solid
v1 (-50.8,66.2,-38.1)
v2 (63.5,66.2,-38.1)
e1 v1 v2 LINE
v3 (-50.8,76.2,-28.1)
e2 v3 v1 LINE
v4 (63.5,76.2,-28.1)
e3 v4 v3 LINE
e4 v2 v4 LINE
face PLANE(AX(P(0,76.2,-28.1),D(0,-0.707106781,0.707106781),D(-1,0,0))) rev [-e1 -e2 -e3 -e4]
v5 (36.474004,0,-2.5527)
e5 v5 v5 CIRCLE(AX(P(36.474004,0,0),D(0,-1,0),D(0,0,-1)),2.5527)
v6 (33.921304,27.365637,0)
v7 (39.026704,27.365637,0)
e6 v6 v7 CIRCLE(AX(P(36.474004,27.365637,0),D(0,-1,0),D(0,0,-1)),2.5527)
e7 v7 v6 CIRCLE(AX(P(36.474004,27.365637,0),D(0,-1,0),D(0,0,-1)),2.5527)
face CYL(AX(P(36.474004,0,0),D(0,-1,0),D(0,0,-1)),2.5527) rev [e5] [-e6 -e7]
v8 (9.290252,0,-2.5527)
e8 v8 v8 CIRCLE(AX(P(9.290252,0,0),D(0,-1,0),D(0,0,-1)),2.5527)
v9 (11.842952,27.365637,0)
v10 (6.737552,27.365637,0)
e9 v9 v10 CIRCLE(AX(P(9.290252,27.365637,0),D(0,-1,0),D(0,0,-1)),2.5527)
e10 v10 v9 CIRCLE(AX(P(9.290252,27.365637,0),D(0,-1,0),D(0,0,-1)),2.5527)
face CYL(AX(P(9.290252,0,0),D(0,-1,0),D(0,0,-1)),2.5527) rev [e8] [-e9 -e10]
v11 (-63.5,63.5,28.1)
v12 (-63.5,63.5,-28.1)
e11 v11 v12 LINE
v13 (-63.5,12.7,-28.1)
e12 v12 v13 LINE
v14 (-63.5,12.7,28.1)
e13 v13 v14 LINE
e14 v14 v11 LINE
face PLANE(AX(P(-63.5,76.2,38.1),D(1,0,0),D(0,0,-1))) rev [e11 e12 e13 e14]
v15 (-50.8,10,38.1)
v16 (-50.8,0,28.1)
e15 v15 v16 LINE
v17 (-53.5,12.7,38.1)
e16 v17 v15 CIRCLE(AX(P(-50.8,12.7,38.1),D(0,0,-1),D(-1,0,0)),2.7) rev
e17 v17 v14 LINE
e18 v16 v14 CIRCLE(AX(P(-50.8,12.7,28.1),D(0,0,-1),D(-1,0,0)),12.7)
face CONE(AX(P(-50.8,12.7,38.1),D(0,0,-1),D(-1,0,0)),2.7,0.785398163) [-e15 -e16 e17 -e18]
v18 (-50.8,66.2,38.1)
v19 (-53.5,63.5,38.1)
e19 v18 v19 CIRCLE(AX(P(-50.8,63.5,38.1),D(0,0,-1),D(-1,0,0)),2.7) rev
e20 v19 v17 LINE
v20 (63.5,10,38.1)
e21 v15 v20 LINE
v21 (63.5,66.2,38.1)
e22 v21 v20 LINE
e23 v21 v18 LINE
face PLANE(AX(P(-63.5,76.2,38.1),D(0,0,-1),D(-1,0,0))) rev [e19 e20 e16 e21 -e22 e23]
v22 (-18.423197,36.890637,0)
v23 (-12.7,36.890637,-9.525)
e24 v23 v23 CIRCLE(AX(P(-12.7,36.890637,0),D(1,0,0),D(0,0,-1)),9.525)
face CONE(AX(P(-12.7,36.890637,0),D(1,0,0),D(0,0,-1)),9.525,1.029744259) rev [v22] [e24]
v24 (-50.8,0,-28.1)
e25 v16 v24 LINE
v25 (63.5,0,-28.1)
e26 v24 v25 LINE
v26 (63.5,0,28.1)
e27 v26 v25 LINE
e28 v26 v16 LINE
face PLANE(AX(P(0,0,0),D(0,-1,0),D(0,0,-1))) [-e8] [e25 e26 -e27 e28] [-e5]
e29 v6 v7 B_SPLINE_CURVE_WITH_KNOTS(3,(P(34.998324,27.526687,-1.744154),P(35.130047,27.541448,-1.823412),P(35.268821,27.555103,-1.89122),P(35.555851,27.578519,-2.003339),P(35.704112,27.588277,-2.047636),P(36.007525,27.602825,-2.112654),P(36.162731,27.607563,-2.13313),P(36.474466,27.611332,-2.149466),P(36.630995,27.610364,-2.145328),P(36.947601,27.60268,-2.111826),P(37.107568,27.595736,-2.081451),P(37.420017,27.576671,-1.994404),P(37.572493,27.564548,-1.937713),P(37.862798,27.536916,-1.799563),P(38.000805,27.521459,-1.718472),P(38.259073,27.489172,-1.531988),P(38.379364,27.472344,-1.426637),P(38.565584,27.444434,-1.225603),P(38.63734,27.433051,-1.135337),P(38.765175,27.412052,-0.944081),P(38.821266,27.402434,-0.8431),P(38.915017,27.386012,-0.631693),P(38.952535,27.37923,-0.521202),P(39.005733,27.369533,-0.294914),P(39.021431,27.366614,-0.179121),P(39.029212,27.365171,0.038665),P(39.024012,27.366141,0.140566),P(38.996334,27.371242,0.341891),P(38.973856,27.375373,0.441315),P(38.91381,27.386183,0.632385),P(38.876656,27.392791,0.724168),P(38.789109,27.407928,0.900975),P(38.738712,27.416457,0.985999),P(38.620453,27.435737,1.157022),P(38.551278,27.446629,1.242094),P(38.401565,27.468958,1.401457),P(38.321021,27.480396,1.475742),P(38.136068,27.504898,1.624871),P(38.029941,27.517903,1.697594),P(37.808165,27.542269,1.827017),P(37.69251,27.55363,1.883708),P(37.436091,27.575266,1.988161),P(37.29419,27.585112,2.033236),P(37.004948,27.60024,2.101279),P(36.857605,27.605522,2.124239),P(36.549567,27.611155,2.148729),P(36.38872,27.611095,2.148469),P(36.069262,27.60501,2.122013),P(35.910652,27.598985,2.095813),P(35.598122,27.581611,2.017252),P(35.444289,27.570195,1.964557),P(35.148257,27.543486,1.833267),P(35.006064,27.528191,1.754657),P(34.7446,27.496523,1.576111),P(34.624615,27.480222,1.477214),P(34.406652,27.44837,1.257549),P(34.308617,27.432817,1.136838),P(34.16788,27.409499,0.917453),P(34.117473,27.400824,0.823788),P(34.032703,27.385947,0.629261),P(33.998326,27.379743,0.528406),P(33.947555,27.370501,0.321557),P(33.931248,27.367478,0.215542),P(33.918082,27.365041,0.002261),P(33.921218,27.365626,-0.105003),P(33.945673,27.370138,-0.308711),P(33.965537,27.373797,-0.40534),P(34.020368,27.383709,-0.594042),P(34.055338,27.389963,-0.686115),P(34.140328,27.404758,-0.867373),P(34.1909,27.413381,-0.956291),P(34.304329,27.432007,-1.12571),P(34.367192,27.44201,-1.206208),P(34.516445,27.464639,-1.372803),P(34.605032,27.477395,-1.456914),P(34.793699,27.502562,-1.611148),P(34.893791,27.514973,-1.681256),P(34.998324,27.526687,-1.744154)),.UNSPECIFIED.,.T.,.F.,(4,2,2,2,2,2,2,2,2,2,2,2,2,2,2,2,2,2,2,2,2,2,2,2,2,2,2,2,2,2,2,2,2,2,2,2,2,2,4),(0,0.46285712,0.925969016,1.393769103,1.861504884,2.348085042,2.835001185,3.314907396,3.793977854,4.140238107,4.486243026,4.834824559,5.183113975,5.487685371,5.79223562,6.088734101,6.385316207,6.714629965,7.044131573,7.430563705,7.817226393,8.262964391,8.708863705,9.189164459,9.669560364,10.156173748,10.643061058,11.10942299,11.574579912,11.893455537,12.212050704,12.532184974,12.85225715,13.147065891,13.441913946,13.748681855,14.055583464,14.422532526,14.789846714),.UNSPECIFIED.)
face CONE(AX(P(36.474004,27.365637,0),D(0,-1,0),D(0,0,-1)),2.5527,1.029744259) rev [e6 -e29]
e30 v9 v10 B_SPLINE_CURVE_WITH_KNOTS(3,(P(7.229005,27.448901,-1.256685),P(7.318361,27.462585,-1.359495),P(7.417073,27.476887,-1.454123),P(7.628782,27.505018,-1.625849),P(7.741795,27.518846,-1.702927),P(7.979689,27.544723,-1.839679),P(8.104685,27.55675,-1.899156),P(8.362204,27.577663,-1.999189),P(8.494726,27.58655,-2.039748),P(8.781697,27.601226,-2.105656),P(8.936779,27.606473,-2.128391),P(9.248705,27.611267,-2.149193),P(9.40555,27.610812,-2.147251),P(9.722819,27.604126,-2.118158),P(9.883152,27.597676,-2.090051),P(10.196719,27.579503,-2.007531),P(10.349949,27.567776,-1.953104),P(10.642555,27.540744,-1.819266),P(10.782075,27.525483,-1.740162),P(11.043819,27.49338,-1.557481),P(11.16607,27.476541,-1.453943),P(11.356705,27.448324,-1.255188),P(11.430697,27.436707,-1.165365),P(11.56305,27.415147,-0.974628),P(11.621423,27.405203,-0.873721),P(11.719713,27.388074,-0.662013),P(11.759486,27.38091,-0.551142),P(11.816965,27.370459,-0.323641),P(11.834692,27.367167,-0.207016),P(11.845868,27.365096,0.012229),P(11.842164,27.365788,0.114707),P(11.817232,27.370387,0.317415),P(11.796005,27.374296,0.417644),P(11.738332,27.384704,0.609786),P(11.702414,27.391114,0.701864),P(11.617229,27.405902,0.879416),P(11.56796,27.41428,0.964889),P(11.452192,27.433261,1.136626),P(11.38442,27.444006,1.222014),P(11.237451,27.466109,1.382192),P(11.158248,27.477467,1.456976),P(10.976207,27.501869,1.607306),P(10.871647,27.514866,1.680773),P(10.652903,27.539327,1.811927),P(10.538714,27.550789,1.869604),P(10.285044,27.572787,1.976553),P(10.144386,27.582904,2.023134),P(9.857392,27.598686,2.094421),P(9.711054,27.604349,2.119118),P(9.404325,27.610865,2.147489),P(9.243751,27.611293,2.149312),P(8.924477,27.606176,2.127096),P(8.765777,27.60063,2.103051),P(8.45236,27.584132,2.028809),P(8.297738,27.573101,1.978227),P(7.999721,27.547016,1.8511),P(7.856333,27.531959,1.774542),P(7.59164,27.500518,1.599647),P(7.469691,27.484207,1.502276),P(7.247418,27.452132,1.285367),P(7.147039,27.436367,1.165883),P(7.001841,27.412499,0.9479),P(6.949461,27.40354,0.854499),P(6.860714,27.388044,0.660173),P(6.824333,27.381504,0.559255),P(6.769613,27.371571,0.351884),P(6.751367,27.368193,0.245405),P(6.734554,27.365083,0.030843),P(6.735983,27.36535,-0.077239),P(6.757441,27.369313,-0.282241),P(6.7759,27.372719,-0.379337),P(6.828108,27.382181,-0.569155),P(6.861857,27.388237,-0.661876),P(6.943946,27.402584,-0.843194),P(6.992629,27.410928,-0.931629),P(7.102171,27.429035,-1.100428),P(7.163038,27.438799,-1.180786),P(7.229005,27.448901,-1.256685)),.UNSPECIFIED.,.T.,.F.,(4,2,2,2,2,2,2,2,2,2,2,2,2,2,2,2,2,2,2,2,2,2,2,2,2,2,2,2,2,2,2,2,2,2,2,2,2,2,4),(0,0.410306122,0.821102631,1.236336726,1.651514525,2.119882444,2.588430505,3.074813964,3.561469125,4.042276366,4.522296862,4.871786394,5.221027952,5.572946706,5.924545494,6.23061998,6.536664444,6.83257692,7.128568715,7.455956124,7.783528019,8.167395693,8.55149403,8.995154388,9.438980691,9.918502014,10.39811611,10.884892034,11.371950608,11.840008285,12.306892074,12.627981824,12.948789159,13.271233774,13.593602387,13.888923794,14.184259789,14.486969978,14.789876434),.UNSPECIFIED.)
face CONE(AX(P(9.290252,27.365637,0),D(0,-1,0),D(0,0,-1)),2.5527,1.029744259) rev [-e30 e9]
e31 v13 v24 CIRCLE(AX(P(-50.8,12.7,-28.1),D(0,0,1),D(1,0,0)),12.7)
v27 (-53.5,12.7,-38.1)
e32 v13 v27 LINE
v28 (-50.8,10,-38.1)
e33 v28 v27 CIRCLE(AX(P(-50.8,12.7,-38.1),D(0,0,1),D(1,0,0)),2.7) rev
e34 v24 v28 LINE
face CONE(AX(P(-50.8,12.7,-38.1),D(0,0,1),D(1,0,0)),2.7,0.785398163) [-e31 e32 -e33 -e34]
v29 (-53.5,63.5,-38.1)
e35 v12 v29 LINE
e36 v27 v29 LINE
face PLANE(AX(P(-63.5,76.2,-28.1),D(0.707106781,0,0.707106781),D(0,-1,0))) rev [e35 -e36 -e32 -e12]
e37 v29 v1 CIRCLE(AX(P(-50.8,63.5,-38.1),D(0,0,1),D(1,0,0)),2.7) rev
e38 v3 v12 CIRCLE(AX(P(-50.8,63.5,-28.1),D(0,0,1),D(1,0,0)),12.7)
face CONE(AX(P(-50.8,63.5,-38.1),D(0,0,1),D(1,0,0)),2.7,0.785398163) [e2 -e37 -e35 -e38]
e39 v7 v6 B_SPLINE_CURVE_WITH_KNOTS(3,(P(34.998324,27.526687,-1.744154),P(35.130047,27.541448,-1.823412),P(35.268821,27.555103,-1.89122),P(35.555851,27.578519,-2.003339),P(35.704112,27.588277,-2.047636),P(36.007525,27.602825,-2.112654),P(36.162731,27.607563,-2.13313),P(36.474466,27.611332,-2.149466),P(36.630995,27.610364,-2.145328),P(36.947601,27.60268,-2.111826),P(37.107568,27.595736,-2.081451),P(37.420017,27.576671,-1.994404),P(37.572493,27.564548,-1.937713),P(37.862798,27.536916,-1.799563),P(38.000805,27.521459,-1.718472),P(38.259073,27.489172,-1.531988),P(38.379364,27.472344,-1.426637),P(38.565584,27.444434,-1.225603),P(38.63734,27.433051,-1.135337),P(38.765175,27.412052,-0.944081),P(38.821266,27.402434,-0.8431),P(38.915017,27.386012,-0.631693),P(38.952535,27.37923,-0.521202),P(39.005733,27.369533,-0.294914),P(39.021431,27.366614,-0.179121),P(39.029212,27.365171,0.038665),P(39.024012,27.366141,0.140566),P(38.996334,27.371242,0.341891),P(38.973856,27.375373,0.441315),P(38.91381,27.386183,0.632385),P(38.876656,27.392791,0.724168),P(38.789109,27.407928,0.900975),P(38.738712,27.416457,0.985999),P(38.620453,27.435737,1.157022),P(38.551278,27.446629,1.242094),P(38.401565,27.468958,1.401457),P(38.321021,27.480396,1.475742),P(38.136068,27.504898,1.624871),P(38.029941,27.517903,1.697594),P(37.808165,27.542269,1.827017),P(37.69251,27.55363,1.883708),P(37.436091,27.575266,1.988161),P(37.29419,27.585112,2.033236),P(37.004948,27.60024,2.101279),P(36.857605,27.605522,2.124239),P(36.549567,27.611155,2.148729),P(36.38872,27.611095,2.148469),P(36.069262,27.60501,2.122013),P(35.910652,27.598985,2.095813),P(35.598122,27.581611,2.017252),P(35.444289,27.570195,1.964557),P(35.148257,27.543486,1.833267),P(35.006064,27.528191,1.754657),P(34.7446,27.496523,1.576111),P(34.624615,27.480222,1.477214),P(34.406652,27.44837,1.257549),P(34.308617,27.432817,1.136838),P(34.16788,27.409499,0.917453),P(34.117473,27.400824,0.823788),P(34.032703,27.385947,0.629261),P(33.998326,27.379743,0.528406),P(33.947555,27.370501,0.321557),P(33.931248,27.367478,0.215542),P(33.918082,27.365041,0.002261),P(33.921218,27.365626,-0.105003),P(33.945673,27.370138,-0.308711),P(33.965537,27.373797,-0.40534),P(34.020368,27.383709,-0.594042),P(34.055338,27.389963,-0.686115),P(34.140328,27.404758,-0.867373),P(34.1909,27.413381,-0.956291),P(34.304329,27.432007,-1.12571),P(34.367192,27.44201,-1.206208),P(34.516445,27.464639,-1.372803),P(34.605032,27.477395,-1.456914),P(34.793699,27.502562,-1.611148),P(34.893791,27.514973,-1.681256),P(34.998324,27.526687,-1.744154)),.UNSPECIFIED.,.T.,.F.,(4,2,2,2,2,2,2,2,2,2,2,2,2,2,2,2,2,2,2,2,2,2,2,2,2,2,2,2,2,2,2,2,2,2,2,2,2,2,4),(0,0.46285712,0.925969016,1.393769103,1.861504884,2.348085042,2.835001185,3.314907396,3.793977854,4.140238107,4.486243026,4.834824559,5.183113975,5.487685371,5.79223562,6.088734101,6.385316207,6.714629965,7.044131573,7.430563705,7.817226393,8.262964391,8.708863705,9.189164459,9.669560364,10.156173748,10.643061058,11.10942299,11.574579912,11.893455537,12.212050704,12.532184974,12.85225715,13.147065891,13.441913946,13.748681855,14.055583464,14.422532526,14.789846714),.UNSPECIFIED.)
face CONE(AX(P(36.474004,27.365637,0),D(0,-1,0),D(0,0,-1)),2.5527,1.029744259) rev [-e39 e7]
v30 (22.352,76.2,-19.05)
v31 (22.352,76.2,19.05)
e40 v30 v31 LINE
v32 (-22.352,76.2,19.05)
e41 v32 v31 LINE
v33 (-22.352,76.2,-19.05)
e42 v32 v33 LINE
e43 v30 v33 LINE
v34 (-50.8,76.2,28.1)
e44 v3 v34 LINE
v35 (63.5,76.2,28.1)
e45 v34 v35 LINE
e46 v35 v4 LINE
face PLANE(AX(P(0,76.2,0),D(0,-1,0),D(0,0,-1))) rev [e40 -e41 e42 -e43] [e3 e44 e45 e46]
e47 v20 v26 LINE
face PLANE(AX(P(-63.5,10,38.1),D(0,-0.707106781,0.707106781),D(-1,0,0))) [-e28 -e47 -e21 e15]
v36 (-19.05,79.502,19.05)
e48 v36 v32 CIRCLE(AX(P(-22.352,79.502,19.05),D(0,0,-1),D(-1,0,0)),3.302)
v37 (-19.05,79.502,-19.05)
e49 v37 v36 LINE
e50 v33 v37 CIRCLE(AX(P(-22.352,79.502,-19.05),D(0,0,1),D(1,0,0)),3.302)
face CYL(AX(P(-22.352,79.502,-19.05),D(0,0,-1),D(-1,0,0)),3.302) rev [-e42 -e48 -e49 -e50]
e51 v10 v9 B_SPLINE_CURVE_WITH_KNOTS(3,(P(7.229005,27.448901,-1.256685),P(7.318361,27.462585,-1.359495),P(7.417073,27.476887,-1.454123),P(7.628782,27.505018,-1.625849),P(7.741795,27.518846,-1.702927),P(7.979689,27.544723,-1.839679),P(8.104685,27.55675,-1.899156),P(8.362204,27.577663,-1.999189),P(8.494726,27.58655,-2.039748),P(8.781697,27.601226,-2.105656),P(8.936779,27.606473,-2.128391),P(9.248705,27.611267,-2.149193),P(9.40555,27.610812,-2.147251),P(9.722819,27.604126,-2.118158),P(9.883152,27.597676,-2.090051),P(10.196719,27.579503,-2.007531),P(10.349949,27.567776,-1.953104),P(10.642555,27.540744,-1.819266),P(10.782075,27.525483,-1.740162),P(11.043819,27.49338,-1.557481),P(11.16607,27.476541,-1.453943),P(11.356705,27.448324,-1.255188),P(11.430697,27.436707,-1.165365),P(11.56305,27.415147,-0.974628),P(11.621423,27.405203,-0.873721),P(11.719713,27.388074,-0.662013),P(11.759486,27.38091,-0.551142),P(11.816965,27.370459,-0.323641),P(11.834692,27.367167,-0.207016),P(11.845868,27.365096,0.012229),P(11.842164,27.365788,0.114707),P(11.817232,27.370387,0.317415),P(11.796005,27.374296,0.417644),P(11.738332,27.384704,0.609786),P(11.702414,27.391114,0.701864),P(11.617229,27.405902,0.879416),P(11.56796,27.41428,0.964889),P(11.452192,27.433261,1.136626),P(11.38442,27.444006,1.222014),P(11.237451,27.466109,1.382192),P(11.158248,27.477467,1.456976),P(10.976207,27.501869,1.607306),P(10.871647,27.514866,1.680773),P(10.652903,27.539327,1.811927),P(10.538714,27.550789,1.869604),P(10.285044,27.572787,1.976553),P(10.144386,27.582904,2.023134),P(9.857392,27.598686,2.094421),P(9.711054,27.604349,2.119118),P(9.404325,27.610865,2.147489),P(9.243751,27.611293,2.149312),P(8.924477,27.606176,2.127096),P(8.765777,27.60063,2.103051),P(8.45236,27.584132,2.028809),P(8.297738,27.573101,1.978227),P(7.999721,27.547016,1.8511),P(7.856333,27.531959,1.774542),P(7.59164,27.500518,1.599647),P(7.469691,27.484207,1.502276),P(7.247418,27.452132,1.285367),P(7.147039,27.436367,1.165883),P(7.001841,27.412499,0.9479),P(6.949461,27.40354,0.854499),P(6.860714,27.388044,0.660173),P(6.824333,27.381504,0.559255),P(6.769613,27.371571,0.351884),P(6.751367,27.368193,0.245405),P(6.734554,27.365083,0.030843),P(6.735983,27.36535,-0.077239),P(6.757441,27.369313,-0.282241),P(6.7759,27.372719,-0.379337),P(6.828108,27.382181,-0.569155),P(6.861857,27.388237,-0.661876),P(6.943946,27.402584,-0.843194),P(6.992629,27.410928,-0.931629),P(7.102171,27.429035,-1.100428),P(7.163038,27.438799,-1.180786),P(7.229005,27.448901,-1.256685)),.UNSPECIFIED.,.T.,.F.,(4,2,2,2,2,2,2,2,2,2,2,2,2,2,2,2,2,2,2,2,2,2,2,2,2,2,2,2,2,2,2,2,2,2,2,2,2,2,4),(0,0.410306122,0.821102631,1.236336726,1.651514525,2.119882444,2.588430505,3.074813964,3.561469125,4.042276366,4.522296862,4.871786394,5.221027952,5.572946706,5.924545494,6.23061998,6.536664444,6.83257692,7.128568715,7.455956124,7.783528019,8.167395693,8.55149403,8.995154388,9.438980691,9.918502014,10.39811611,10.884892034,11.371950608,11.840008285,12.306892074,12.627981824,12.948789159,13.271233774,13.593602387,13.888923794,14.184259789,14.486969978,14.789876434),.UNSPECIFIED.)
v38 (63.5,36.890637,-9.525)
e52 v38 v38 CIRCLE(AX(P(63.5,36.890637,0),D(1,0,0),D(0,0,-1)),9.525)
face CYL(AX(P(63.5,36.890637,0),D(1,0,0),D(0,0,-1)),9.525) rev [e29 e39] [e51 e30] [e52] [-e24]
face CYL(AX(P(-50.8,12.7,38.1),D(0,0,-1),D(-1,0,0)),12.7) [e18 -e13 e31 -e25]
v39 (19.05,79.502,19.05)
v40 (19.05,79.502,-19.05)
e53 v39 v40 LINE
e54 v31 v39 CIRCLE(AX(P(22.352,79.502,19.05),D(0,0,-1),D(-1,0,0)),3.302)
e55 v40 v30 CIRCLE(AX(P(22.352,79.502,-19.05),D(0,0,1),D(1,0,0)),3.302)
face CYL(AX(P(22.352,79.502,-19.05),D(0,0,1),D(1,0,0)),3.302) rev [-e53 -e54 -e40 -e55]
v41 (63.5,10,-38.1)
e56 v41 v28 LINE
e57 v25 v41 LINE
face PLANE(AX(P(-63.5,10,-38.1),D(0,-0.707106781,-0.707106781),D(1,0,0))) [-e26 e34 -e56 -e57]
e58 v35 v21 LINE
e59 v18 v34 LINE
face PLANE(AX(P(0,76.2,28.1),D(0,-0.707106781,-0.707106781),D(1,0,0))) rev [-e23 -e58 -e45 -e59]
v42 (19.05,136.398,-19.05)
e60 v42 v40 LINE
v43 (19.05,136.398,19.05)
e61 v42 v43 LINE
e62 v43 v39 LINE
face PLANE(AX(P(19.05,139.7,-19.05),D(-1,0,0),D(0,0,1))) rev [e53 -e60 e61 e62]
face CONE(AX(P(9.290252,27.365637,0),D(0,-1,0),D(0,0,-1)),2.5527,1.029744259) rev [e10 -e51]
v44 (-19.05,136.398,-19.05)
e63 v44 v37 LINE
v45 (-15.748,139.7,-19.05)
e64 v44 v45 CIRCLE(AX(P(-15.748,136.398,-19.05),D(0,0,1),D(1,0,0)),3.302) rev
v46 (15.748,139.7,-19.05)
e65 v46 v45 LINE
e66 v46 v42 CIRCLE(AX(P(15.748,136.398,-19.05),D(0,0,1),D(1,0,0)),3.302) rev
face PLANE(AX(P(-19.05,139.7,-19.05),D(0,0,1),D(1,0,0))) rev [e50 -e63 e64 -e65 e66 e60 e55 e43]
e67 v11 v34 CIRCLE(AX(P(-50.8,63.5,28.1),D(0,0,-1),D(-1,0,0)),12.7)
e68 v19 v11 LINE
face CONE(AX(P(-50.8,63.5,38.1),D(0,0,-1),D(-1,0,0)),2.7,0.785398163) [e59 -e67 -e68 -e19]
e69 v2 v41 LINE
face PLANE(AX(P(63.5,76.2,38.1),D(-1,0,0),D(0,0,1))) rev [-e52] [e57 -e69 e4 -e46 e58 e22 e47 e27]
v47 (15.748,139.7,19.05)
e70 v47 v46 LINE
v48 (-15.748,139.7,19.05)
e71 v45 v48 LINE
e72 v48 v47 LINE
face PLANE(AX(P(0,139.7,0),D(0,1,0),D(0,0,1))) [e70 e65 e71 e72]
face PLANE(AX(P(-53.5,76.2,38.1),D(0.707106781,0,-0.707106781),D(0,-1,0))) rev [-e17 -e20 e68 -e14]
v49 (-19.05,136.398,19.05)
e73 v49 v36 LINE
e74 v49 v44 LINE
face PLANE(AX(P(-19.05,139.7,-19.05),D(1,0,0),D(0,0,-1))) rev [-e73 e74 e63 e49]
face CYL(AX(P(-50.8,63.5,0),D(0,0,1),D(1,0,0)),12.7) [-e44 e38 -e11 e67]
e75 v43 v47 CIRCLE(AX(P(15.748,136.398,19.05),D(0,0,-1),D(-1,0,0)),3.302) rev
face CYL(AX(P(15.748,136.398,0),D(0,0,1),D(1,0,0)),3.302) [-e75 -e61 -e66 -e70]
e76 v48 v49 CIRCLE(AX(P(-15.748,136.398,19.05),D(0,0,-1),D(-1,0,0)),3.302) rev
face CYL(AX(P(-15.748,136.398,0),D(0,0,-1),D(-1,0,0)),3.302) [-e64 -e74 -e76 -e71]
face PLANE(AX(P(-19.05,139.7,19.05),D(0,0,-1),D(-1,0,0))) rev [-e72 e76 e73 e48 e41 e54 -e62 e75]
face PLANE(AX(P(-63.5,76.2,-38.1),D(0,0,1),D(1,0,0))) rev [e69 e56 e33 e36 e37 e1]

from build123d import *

# Parameters (mm, degrees)
SKETCH2_W                      = 127
SKETCH2_H                      = 76.2
BOSS_EXTRUDE2_DEPTH            = 76.2
FILLET1_R                      = 12.7
CHAMFER1_SIZE                  = 10
F_3_4_0_7500_DOWEL_HOLE1_D     = 19.05
F_3_4_0_7500_DOWEL_HOLE1_DEPTH = 76.2
F_3_4_0_7500_DOWEL_HOLE1_TIP   = 5.723197396
SKETCH9_W                      = 38.1
SKETCH9_H                      = 38.1
BOSS_EXTRUDE3_DEPTH            = 63.5
FILLET2_R                      = 3.302


# Read off the part's stored shape, not the designer's step: 1/4-20 Tapped Hole1
with BuildPart() as part:
    # Sketch2 → Boss-Extrude2 (new body)
    with BuildSketch(Plane(origin=(0, 0, 0), x_dir=(1, 0, 0), z_dir=(0, 1, 0))):
        Rectangle(SKETCH2_W, SKETCH2_H)
    extrude(amount=BOSS_EXTRUDE2_DEPTH)

    # Fillet1
    fillet1_edges = [part.edges().sort_by_distance(p)[0] for p in [
        (-63.5, 76.2, 0),
        (-63.5, 0, 0),
    ]]
    fillet(fillet1_edges, radius=FILLET1_R)

    # Chamfer1
    chamfer1_edges = [part.edges().sort_by_distance(p)[0] for p in [
        (-63.5, 38.1, 38.1),
        (-63.5, 38.1, -38.1),
        (6.35, 0, 38.1),
        (6.35, 76.2, 38.1),
        (-59.780256121, 72.480256121, 38.1),
        (-59.780256121, 3.719743879, 38.1),
        (-59.780256121, 72.480256121, -38.1),
        (-59.780256121, 3.719743879, -38.1),
        (6.35, 0, -38.1),
        (6.35, 76.2, -38.1),
    ]]
    chamfer(chamfer1_edges, length=CHAMFER1_SIZE)

    # 3/4 (0.7500) Dowel Hole1
    with Locations(Plane(origin=(63.5, 0, 0), x_dir=(0, 0, -1), z_dir=(1, 0, 0))):
        with Locations((0, 36.890636669)):
            Hole(F_3_4_0_7500_DOWEL_HOLE1_D / 2, depth=F_3_4_0_7500_DOWEL_HOLE1_DEPTH)
            with Locations((0, 0, -(F_3_4_0_7500_DOWEL_HOLE1_DEPTH + F_3_4_0_7500_DOWEL_HOLE1_TIP / 2))):  # 118° drill point
                Cone(0, F_3_4_0_7500_DOWEL_HOLE1_D / 2, F_3_4_0_7500_DOWEL_HOLE1_TIP, mode=Mode.SUBTRACT)

    # 1/4-20 Tapped Hole1 outline → 1/4-20 Tapped Hole1 (revolve, cut)
    with BuildSketch(Plane(origin=(9.290251981, 0, 0), x_dir=(1, 0, 0), z_dir=(0, 0, 1))):
        Polygon((2.145213652, 27.610479168), (0, 27.610479168), (0, 0), (2.5527, 0), (2.5527, 27.365636669), align=None)
    revolve(axis=Axis((9.290251981, 0, 0), (0, 1, 0)), mode=Mode.SUBTRACT)

    # 1_4-20 Tapped Hole1 2 outline → 1_4-20 Tapped Hole1 2 (revolve, cut)
    with BuildSketch(Plane(origin=(36.474004082, 0, 0), x_dir=(1, 0, 0), z_dir=(0, 0, 1))):
        Polygon((2.5527, 0), (2.5527, 27.365636669), (2.145213678, 27.610479152), (0, 27.610479152), (0, 0), align=None)
    revolve(axis=Axis((36.474004082, 0, 0), (0, 1, 0)), mode=Mode.SUBTRACT)

    # Sketch9 → Boss-Extrude3 (add)
    with BuildSketch(Plane(origin=(0, 76.2, 0), x_dir=(1, 0, 0), z_dir=(0, 1, 0))):
        Rectangle(SKETCH9_W, SKETCH9_H)
    extrude(amount=BOSS_EXTRUDE3_DEPTH)

    # Fillet2
    fillet2_edges = [part.edges().sort_by_distance(p)[0] for p in [
        (19.05, 76.2, 0),
        (-19.05, 76.2, 0),
        (19.05, 139.7, 0),
        (-19.05, 139.7, 0),
    ]]
    fillet(fillet2_edges, radius=FILLET2_R)


solid = part.part
